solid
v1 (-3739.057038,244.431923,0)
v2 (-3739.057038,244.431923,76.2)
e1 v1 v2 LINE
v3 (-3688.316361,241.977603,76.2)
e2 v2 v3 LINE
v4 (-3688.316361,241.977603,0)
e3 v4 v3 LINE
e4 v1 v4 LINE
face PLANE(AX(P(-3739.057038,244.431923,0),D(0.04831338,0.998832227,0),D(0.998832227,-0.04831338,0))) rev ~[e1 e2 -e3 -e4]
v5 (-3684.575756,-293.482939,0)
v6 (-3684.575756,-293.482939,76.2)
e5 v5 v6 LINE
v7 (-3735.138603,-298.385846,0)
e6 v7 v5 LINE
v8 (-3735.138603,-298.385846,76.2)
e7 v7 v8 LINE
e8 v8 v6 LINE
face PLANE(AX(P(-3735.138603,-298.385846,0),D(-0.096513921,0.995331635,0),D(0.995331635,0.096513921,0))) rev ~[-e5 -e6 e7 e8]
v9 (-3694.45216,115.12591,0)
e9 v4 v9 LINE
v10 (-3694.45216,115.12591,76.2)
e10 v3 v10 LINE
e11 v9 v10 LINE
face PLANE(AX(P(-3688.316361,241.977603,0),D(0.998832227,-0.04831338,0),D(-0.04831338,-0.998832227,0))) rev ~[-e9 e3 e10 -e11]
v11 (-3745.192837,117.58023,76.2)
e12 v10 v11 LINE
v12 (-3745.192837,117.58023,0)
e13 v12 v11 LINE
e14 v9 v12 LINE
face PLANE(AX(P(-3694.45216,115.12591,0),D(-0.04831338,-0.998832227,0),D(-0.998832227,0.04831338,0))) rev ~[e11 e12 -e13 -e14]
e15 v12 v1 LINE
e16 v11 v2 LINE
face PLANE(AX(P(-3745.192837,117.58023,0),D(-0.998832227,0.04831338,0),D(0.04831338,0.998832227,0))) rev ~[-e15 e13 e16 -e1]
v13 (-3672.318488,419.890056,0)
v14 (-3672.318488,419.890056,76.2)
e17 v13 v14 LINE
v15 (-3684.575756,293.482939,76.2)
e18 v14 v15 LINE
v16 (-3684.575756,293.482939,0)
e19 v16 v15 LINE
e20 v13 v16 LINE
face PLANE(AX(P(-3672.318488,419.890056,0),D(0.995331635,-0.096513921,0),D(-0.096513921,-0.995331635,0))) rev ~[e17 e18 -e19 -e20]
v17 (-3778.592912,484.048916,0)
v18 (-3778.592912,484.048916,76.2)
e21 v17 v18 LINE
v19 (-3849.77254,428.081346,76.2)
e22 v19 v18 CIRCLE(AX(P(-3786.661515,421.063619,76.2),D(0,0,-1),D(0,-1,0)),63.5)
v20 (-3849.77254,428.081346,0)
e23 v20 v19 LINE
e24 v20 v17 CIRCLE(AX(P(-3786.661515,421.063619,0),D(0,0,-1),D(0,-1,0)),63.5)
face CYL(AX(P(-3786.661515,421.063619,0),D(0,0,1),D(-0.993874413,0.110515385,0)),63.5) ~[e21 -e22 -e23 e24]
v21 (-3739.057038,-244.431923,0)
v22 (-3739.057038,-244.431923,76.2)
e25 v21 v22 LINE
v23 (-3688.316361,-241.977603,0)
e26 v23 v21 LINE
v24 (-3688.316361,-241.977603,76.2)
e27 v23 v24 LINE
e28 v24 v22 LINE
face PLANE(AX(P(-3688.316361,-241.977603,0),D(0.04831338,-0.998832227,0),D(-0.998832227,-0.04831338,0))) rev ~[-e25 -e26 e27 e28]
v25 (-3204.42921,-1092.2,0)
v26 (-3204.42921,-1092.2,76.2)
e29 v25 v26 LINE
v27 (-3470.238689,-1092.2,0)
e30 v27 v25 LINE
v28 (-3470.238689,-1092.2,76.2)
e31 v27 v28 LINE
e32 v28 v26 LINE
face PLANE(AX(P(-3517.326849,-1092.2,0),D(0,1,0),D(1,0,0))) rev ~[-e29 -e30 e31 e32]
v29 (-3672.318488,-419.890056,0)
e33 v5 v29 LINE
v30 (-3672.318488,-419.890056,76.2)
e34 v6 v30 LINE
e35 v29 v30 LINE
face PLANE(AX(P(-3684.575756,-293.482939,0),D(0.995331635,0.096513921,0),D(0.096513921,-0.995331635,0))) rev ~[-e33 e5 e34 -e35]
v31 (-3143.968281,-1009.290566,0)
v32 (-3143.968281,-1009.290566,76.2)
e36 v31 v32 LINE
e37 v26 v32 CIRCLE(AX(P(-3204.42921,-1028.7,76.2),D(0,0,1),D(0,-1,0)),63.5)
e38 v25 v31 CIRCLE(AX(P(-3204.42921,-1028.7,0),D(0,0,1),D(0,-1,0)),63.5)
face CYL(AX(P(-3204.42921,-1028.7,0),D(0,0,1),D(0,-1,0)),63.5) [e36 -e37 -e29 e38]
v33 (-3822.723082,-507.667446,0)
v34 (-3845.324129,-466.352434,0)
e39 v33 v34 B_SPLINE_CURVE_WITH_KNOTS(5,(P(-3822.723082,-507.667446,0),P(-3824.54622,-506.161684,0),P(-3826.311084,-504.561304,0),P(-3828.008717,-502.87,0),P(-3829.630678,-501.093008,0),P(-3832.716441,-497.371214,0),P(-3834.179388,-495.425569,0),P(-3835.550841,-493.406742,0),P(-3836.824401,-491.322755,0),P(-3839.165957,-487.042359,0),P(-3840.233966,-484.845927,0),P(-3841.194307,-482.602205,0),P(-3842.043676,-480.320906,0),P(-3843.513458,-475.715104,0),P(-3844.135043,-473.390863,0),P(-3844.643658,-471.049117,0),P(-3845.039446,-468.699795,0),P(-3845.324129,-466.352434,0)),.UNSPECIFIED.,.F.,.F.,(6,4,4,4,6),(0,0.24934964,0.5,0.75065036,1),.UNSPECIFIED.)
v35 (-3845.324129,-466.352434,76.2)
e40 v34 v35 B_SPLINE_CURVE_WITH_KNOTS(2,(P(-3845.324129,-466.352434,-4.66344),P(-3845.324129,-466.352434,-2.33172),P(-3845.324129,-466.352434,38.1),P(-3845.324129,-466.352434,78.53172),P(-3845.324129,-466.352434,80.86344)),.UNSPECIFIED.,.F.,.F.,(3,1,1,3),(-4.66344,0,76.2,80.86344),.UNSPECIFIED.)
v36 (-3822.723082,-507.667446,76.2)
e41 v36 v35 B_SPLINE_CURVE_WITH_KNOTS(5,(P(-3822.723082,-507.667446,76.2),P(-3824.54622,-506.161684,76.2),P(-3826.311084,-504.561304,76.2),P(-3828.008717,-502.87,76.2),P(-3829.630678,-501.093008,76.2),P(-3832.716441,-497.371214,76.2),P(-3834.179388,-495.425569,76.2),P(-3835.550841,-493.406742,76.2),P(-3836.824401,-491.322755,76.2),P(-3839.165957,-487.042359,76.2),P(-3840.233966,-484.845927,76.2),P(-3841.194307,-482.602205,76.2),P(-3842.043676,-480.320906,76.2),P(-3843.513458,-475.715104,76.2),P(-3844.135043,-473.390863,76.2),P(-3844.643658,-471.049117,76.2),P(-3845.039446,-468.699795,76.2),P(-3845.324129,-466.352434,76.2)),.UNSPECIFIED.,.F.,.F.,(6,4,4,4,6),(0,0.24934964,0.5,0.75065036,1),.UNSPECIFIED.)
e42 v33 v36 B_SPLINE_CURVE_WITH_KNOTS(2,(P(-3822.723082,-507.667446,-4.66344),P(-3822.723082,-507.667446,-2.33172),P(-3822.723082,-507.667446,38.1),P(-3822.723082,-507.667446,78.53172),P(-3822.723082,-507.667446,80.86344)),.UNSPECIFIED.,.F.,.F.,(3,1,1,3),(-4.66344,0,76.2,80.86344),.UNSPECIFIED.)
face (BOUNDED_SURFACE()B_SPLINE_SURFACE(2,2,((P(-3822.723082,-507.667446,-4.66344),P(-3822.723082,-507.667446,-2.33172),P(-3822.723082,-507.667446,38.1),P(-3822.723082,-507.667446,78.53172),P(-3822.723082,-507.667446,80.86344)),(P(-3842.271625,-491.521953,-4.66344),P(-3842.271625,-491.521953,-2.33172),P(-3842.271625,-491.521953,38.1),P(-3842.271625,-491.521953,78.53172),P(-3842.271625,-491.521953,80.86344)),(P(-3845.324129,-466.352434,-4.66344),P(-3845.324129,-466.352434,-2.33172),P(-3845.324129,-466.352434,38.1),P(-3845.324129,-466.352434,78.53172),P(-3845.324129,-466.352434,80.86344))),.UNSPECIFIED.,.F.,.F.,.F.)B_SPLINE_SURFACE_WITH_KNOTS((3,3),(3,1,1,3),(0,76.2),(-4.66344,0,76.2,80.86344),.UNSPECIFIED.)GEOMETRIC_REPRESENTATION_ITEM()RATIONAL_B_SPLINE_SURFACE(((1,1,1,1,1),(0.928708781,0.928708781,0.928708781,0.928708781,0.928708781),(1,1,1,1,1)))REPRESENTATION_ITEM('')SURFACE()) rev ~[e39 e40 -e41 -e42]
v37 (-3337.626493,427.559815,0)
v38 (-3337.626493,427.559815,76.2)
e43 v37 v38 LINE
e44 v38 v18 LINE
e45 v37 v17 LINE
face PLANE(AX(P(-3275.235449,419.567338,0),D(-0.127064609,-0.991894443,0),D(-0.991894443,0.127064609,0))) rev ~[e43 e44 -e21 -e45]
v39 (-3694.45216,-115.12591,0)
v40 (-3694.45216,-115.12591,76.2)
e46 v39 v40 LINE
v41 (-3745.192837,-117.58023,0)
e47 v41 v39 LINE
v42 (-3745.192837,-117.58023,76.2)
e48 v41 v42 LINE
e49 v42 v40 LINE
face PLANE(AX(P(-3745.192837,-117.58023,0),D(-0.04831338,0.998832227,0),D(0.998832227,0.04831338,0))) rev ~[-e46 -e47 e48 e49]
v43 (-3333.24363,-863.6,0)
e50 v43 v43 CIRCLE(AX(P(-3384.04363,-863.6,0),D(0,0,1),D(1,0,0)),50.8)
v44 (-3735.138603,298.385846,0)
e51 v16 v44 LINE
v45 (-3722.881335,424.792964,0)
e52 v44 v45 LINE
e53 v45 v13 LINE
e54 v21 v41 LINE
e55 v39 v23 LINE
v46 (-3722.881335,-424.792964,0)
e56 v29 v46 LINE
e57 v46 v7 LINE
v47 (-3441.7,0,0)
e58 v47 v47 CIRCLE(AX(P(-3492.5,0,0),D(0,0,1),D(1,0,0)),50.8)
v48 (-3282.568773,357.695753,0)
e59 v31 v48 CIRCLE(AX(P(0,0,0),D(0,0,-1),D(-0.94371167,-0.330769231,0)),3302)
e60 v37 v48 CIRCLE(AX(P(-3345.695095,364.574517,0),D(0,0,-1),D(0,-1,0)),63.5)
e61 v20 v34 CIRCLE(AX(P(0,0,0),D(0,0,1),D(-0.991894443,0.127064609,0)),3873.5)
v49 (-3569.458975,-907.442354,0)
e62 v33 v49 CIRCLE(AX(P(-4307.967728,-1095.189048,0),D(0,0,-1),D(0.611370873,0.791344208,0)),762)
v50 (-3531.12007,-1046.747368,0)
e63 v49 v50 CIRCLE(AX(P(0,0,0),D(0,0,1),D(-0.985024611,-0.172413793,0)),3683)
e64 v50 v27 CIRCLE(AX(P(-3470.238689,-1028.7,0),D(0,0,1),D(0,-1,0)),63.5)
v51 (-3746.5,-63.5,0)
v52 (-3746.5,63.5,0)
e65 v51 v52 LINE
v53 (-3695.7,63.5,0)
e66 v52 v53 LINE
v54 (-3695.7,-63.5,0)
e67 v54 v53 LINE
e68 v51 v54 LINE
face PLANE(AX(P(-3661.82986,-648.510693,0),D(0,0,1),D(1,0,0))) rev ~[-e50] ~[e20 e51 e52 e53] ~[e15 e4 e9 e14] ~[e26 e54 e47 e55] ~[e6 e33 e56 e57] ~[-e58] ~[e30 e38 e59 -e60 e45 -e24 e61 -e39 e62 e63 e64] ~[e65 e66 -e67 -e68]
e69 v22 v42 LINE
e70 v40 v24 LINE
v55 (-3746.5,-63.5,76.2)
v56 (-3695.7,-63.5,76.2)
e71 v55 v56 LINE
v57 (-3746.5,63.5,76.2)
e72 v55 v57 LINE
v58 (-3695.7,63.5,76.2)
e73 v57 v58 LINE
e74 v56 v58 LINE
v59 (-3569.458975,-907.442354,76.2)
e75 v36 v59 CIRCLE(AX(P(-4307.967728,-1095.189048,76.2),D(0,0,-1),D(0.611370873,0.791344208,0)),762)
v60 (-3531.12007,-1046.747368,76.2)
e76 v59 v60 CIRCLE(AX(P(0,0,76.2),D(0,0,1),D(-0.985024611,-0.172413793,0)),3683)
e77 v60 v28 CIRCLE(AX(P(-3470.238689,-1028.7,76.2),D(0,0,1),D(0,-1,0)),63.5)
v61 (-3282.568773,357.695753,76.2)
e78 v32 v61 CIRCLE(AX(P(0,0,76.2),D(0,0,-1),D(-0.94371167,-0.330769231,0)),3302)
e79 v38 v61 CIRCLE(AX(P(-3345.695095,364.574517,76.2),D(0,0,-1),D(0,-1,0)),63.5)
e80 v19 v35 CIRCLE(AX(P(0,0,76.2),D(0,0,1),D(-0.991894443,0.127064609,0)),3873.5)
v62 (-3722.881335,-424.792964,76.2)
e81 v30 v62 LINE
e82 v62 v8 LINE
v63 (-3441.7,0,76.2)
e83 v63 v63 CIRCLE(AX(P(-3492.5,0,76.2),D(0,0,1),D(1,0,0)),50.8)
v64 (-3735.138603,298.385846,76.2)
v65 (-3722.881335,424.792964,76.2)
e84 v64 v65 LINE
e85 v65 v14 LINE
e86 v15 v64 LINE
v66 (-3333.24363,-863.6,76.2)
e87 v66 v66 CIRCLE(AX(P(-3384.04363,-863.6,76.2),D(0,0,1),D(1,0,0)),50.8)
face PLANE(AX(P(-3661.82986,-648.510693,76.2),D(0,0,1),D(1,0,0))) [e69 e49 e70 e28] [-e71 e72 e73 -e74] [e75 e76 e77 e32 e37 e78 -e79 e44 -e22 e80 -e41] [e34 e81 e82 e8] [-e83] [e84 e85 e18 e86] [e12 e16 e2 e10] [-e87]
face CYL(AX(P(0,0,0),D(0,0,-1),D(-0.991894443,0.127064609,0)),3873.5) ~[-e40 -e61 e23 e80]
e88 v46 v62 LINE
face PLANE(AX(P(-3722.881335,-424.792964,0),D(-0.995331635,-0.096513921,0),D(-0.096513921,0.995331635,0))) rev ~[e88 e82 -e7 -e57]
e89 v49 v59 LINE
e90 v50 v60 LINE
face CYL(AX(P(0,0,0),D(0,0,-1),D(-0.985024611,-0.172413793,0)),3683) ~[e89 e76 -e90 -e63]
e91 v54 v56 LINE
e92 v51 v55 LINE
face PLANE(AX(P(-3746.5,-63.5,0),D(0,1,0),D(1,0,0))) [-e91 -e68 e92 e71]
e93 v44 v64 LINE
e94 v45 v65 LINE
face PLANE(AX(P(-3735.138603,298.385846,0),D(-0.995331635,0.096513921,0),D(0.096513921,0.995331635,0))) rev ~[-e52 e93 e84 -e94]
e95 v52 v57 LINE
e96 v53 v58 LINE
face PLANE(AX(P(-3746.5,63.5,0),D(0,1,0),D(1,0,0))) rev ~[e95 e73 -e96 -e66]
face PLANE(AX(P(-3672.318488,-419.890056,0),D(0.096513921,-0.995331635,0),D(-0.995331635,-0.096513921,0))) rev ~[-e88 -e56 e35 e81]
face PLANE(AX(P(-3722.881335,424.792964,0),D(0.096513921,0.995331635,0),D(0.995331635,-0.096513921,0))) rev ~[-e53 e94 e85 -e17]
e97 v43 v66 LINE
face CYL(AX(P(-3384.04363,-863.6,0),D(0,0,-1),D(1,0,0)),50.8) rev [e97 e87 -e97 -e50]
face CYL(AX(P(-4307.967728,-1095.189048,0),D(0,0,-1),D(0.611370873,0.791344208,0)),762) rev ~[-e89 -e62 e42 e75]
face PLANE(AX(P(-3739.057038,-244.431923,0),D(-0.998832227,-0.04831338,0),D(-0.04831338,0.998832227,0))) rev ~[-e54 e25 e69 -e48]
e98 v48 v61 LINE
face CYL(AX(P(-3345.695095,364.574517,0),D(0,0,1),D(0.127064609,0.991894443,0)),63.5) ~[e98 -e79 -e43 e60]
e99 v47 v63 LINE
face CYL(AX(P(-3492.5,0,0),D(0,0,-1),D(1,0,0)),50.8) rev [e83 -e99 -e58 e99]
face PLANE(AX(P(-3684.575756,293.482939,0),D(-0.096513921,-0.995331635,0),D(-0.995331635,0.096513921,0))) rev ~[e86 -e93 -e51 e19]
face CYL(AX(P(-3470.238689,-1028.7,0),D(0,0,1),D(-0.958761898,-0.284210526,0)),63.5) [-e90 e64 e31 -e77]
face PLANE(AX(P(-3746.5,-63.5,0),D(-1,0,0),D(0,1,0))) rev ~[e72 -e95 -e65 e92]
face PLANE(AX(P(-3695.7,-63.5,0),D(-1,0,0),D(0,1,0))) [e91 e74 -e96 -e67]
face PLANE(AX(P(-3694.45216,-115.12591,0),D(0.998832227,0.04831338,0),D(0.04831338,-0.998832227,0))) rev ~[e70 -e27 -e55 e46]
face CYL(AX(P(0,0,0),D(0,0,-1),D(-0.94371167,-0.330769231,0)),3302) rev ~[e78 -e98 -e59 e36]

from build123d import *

# Parameters (mm, degrees)
F0_W        = 50.8
F0_H        = 127
F0_R        = 50.8
F1_DEPTH    = 76.2
F2_T1_DEPTH = 76.2
F3_R        = 63.5


# Not quite as in the source:
# - a fillet or chamfer that OpenCascade refuses, or shapes differently, is made with other operations: its cross-section is extruded or revolved along the edge and cut away or added
# - a feature names something its author has since deleted; it is built from what else it names


with BuildPart() as f1:
    # F0 (on Top) → F1 (new body)
    with BuildSketch(Plane.XY):
        with BuildLine():
            Line((-3842.1031233725, -492.1847614173), (-3653.1472320591, -467.9789534788))
            ThreePointArc((-3653.1472320591, -467.9789534788), (-3683, 0), (-3653.1472320591, 467.9789534788))
            Line((-3653.1472320591, 467.9789534788), (-3842.1031233725, 492.1847614173))
            ThreePointArc((-3842.1031233725, 492.1847614173), (-3873.5, 0), (-3842.1031233725, -492.1847614173))
        make_face()
        Polygon((-3672.3184884479, -419.8900563283), (-3722.8813354916, -424.7929635108), (-3735.1386034477, -298.3858459017), (-3684.5757564041, -293.4829387192), align=None, mode=Mode.SUBTRACT)
        Polygon((-3688.3163611044, -241.9776031163), (-3739.0570382274, -244.4319227962), (-3745.1928374272, -117.5802299885), (-3694.4521603041, -115.1259103086), align=None, mode=Mode.SUBTRACT)
        with Locations((-3721.1, 0)):
            Rectangle(F0_W, F0_H, mode=Mode.SUBTRACT)
        Polygon((-3694.4521603041, 115.1259103086), (-3745.1928374272, 117.5802299885), (-3739.0570382274, 244.4319227962), (-3688.3163611044, 241.9776031163), align=None, mode=Mode.SUBTRACT)
        Polygon((-3684.5757564041, 293.4829387192), (-3735.1386034477, 298.3858459017), (-3722.8813354916, 424.7929635108), (-3672.3184884479, 419.8900563283), align=None, mode=Mode.SUBTRACT)
        with BuildLine():
            Line((-3653.1472320591, -467.9789534788), (-3275.2354494323, -419.5673376017))
            ThreePointArc((-3275.2354494323, -419.5673376016), (-3302, 0), (-3275.2354494323, 419.5673376016))
            Line((-3275.2354494323, 419.5673376017), (-3653.1472320591, 467.9789534788))
            ThreePointArc((-3653.1472320591, 467.9789534788), (-3683, 0), (-3653.1472320591, -467.9789534788))
        make_face()
        with Locations((-3492.5, 0)):
            Circle(F0_R, mode=Mode.SUBTRACT)
        with BuildLine():
            Line((-3627.8456416998, -635), (-3240.367108832, -635))
            ThreePointArc((-3240.367108832, -635), (-3259.5815655268, -527.5718128161), (-3275.2354494323, -419.5673376016))
            Line((-3275.2354494323, -419.5673376017), (-3653.1472320591, -467.9789534788))
            ThreePointArc((-3653.1472320591, -467.9789534788), (-3641.4541483351, -551.6345579938), (-3627.8456416998, -635))
        make_face()
        with BuildLine():
            Line((-3517.3268486167, -1092.2), (-3116.1359341338, -1092.2))
            ThreePointArc((-3116.1359341338, -1092.2000000001), (-3186.4620967161, -865.8309917021), (-3240.367108832, -635))
            Line((-3240.367108832, -635), (-3627.8456416998, -635))
            ThreePointArc((-3627.8456416998, -635), (-3579.8925178131, -865.3661426853), (-3517.3268486167, -1092.1999999999))
        make_face()
        with Locations((-3384.0436300379, -863.6)):
            Circle(F0_R, mode=Mode.SUBTRACT)
    extrude(amount=F1_DEPTH)

    # F2: fillet of radius 762 on 1 edges, made by hand

    # F2_s2 → F2_t1 (join)
    with BuildSketch(Plane.XY):
        with BuildLine():
            ThreePointArc((-3842.1031233725, -492.1847614173), (-3670.9916584142, -676.9720156234), (-3569.4589749529, -907.4423541626))
            Line((-3569.4589749529, -907.4423541626), (-3554.6887998841, -903.6874202833))
            ThreePointArc((-3554.6887998841, -903.6874202833), (-3603.0108161093, -686.1315301017), (-3638.030760754, -466.0424888437))
            Line((-3638.030760754, -466.0424888437), (-3655.0836966942, -452.8624821737))
            ThreePointArc((-3655.0836966942, -452.8624821737), (-3749.5616423509, -464.965386143), (-3832.7858312721, -480.1246756831))
            Line((-3832.7858312721, -480.1246756831), (-3842.1031233725, -492.1847614173))
        make_face()
    extrude(amount=F2_T1_DEPTH)

    # F3
    f3_edges = [f1.edges().sort_by_distance(p)[0] for p in [
        (-3842.103123, -492.184761, 38.1),
        (-3842.103123, 492.184761, 38.1),
        (-3275.235449, 419.567338, 38.1),
        (-3116.135934, -1092.2, 38.1),
        (-3517.326849, -1092.2, 38.1),
    ]]
    fillet(f3_edges, radius=F3_R)


solid = f1.part
